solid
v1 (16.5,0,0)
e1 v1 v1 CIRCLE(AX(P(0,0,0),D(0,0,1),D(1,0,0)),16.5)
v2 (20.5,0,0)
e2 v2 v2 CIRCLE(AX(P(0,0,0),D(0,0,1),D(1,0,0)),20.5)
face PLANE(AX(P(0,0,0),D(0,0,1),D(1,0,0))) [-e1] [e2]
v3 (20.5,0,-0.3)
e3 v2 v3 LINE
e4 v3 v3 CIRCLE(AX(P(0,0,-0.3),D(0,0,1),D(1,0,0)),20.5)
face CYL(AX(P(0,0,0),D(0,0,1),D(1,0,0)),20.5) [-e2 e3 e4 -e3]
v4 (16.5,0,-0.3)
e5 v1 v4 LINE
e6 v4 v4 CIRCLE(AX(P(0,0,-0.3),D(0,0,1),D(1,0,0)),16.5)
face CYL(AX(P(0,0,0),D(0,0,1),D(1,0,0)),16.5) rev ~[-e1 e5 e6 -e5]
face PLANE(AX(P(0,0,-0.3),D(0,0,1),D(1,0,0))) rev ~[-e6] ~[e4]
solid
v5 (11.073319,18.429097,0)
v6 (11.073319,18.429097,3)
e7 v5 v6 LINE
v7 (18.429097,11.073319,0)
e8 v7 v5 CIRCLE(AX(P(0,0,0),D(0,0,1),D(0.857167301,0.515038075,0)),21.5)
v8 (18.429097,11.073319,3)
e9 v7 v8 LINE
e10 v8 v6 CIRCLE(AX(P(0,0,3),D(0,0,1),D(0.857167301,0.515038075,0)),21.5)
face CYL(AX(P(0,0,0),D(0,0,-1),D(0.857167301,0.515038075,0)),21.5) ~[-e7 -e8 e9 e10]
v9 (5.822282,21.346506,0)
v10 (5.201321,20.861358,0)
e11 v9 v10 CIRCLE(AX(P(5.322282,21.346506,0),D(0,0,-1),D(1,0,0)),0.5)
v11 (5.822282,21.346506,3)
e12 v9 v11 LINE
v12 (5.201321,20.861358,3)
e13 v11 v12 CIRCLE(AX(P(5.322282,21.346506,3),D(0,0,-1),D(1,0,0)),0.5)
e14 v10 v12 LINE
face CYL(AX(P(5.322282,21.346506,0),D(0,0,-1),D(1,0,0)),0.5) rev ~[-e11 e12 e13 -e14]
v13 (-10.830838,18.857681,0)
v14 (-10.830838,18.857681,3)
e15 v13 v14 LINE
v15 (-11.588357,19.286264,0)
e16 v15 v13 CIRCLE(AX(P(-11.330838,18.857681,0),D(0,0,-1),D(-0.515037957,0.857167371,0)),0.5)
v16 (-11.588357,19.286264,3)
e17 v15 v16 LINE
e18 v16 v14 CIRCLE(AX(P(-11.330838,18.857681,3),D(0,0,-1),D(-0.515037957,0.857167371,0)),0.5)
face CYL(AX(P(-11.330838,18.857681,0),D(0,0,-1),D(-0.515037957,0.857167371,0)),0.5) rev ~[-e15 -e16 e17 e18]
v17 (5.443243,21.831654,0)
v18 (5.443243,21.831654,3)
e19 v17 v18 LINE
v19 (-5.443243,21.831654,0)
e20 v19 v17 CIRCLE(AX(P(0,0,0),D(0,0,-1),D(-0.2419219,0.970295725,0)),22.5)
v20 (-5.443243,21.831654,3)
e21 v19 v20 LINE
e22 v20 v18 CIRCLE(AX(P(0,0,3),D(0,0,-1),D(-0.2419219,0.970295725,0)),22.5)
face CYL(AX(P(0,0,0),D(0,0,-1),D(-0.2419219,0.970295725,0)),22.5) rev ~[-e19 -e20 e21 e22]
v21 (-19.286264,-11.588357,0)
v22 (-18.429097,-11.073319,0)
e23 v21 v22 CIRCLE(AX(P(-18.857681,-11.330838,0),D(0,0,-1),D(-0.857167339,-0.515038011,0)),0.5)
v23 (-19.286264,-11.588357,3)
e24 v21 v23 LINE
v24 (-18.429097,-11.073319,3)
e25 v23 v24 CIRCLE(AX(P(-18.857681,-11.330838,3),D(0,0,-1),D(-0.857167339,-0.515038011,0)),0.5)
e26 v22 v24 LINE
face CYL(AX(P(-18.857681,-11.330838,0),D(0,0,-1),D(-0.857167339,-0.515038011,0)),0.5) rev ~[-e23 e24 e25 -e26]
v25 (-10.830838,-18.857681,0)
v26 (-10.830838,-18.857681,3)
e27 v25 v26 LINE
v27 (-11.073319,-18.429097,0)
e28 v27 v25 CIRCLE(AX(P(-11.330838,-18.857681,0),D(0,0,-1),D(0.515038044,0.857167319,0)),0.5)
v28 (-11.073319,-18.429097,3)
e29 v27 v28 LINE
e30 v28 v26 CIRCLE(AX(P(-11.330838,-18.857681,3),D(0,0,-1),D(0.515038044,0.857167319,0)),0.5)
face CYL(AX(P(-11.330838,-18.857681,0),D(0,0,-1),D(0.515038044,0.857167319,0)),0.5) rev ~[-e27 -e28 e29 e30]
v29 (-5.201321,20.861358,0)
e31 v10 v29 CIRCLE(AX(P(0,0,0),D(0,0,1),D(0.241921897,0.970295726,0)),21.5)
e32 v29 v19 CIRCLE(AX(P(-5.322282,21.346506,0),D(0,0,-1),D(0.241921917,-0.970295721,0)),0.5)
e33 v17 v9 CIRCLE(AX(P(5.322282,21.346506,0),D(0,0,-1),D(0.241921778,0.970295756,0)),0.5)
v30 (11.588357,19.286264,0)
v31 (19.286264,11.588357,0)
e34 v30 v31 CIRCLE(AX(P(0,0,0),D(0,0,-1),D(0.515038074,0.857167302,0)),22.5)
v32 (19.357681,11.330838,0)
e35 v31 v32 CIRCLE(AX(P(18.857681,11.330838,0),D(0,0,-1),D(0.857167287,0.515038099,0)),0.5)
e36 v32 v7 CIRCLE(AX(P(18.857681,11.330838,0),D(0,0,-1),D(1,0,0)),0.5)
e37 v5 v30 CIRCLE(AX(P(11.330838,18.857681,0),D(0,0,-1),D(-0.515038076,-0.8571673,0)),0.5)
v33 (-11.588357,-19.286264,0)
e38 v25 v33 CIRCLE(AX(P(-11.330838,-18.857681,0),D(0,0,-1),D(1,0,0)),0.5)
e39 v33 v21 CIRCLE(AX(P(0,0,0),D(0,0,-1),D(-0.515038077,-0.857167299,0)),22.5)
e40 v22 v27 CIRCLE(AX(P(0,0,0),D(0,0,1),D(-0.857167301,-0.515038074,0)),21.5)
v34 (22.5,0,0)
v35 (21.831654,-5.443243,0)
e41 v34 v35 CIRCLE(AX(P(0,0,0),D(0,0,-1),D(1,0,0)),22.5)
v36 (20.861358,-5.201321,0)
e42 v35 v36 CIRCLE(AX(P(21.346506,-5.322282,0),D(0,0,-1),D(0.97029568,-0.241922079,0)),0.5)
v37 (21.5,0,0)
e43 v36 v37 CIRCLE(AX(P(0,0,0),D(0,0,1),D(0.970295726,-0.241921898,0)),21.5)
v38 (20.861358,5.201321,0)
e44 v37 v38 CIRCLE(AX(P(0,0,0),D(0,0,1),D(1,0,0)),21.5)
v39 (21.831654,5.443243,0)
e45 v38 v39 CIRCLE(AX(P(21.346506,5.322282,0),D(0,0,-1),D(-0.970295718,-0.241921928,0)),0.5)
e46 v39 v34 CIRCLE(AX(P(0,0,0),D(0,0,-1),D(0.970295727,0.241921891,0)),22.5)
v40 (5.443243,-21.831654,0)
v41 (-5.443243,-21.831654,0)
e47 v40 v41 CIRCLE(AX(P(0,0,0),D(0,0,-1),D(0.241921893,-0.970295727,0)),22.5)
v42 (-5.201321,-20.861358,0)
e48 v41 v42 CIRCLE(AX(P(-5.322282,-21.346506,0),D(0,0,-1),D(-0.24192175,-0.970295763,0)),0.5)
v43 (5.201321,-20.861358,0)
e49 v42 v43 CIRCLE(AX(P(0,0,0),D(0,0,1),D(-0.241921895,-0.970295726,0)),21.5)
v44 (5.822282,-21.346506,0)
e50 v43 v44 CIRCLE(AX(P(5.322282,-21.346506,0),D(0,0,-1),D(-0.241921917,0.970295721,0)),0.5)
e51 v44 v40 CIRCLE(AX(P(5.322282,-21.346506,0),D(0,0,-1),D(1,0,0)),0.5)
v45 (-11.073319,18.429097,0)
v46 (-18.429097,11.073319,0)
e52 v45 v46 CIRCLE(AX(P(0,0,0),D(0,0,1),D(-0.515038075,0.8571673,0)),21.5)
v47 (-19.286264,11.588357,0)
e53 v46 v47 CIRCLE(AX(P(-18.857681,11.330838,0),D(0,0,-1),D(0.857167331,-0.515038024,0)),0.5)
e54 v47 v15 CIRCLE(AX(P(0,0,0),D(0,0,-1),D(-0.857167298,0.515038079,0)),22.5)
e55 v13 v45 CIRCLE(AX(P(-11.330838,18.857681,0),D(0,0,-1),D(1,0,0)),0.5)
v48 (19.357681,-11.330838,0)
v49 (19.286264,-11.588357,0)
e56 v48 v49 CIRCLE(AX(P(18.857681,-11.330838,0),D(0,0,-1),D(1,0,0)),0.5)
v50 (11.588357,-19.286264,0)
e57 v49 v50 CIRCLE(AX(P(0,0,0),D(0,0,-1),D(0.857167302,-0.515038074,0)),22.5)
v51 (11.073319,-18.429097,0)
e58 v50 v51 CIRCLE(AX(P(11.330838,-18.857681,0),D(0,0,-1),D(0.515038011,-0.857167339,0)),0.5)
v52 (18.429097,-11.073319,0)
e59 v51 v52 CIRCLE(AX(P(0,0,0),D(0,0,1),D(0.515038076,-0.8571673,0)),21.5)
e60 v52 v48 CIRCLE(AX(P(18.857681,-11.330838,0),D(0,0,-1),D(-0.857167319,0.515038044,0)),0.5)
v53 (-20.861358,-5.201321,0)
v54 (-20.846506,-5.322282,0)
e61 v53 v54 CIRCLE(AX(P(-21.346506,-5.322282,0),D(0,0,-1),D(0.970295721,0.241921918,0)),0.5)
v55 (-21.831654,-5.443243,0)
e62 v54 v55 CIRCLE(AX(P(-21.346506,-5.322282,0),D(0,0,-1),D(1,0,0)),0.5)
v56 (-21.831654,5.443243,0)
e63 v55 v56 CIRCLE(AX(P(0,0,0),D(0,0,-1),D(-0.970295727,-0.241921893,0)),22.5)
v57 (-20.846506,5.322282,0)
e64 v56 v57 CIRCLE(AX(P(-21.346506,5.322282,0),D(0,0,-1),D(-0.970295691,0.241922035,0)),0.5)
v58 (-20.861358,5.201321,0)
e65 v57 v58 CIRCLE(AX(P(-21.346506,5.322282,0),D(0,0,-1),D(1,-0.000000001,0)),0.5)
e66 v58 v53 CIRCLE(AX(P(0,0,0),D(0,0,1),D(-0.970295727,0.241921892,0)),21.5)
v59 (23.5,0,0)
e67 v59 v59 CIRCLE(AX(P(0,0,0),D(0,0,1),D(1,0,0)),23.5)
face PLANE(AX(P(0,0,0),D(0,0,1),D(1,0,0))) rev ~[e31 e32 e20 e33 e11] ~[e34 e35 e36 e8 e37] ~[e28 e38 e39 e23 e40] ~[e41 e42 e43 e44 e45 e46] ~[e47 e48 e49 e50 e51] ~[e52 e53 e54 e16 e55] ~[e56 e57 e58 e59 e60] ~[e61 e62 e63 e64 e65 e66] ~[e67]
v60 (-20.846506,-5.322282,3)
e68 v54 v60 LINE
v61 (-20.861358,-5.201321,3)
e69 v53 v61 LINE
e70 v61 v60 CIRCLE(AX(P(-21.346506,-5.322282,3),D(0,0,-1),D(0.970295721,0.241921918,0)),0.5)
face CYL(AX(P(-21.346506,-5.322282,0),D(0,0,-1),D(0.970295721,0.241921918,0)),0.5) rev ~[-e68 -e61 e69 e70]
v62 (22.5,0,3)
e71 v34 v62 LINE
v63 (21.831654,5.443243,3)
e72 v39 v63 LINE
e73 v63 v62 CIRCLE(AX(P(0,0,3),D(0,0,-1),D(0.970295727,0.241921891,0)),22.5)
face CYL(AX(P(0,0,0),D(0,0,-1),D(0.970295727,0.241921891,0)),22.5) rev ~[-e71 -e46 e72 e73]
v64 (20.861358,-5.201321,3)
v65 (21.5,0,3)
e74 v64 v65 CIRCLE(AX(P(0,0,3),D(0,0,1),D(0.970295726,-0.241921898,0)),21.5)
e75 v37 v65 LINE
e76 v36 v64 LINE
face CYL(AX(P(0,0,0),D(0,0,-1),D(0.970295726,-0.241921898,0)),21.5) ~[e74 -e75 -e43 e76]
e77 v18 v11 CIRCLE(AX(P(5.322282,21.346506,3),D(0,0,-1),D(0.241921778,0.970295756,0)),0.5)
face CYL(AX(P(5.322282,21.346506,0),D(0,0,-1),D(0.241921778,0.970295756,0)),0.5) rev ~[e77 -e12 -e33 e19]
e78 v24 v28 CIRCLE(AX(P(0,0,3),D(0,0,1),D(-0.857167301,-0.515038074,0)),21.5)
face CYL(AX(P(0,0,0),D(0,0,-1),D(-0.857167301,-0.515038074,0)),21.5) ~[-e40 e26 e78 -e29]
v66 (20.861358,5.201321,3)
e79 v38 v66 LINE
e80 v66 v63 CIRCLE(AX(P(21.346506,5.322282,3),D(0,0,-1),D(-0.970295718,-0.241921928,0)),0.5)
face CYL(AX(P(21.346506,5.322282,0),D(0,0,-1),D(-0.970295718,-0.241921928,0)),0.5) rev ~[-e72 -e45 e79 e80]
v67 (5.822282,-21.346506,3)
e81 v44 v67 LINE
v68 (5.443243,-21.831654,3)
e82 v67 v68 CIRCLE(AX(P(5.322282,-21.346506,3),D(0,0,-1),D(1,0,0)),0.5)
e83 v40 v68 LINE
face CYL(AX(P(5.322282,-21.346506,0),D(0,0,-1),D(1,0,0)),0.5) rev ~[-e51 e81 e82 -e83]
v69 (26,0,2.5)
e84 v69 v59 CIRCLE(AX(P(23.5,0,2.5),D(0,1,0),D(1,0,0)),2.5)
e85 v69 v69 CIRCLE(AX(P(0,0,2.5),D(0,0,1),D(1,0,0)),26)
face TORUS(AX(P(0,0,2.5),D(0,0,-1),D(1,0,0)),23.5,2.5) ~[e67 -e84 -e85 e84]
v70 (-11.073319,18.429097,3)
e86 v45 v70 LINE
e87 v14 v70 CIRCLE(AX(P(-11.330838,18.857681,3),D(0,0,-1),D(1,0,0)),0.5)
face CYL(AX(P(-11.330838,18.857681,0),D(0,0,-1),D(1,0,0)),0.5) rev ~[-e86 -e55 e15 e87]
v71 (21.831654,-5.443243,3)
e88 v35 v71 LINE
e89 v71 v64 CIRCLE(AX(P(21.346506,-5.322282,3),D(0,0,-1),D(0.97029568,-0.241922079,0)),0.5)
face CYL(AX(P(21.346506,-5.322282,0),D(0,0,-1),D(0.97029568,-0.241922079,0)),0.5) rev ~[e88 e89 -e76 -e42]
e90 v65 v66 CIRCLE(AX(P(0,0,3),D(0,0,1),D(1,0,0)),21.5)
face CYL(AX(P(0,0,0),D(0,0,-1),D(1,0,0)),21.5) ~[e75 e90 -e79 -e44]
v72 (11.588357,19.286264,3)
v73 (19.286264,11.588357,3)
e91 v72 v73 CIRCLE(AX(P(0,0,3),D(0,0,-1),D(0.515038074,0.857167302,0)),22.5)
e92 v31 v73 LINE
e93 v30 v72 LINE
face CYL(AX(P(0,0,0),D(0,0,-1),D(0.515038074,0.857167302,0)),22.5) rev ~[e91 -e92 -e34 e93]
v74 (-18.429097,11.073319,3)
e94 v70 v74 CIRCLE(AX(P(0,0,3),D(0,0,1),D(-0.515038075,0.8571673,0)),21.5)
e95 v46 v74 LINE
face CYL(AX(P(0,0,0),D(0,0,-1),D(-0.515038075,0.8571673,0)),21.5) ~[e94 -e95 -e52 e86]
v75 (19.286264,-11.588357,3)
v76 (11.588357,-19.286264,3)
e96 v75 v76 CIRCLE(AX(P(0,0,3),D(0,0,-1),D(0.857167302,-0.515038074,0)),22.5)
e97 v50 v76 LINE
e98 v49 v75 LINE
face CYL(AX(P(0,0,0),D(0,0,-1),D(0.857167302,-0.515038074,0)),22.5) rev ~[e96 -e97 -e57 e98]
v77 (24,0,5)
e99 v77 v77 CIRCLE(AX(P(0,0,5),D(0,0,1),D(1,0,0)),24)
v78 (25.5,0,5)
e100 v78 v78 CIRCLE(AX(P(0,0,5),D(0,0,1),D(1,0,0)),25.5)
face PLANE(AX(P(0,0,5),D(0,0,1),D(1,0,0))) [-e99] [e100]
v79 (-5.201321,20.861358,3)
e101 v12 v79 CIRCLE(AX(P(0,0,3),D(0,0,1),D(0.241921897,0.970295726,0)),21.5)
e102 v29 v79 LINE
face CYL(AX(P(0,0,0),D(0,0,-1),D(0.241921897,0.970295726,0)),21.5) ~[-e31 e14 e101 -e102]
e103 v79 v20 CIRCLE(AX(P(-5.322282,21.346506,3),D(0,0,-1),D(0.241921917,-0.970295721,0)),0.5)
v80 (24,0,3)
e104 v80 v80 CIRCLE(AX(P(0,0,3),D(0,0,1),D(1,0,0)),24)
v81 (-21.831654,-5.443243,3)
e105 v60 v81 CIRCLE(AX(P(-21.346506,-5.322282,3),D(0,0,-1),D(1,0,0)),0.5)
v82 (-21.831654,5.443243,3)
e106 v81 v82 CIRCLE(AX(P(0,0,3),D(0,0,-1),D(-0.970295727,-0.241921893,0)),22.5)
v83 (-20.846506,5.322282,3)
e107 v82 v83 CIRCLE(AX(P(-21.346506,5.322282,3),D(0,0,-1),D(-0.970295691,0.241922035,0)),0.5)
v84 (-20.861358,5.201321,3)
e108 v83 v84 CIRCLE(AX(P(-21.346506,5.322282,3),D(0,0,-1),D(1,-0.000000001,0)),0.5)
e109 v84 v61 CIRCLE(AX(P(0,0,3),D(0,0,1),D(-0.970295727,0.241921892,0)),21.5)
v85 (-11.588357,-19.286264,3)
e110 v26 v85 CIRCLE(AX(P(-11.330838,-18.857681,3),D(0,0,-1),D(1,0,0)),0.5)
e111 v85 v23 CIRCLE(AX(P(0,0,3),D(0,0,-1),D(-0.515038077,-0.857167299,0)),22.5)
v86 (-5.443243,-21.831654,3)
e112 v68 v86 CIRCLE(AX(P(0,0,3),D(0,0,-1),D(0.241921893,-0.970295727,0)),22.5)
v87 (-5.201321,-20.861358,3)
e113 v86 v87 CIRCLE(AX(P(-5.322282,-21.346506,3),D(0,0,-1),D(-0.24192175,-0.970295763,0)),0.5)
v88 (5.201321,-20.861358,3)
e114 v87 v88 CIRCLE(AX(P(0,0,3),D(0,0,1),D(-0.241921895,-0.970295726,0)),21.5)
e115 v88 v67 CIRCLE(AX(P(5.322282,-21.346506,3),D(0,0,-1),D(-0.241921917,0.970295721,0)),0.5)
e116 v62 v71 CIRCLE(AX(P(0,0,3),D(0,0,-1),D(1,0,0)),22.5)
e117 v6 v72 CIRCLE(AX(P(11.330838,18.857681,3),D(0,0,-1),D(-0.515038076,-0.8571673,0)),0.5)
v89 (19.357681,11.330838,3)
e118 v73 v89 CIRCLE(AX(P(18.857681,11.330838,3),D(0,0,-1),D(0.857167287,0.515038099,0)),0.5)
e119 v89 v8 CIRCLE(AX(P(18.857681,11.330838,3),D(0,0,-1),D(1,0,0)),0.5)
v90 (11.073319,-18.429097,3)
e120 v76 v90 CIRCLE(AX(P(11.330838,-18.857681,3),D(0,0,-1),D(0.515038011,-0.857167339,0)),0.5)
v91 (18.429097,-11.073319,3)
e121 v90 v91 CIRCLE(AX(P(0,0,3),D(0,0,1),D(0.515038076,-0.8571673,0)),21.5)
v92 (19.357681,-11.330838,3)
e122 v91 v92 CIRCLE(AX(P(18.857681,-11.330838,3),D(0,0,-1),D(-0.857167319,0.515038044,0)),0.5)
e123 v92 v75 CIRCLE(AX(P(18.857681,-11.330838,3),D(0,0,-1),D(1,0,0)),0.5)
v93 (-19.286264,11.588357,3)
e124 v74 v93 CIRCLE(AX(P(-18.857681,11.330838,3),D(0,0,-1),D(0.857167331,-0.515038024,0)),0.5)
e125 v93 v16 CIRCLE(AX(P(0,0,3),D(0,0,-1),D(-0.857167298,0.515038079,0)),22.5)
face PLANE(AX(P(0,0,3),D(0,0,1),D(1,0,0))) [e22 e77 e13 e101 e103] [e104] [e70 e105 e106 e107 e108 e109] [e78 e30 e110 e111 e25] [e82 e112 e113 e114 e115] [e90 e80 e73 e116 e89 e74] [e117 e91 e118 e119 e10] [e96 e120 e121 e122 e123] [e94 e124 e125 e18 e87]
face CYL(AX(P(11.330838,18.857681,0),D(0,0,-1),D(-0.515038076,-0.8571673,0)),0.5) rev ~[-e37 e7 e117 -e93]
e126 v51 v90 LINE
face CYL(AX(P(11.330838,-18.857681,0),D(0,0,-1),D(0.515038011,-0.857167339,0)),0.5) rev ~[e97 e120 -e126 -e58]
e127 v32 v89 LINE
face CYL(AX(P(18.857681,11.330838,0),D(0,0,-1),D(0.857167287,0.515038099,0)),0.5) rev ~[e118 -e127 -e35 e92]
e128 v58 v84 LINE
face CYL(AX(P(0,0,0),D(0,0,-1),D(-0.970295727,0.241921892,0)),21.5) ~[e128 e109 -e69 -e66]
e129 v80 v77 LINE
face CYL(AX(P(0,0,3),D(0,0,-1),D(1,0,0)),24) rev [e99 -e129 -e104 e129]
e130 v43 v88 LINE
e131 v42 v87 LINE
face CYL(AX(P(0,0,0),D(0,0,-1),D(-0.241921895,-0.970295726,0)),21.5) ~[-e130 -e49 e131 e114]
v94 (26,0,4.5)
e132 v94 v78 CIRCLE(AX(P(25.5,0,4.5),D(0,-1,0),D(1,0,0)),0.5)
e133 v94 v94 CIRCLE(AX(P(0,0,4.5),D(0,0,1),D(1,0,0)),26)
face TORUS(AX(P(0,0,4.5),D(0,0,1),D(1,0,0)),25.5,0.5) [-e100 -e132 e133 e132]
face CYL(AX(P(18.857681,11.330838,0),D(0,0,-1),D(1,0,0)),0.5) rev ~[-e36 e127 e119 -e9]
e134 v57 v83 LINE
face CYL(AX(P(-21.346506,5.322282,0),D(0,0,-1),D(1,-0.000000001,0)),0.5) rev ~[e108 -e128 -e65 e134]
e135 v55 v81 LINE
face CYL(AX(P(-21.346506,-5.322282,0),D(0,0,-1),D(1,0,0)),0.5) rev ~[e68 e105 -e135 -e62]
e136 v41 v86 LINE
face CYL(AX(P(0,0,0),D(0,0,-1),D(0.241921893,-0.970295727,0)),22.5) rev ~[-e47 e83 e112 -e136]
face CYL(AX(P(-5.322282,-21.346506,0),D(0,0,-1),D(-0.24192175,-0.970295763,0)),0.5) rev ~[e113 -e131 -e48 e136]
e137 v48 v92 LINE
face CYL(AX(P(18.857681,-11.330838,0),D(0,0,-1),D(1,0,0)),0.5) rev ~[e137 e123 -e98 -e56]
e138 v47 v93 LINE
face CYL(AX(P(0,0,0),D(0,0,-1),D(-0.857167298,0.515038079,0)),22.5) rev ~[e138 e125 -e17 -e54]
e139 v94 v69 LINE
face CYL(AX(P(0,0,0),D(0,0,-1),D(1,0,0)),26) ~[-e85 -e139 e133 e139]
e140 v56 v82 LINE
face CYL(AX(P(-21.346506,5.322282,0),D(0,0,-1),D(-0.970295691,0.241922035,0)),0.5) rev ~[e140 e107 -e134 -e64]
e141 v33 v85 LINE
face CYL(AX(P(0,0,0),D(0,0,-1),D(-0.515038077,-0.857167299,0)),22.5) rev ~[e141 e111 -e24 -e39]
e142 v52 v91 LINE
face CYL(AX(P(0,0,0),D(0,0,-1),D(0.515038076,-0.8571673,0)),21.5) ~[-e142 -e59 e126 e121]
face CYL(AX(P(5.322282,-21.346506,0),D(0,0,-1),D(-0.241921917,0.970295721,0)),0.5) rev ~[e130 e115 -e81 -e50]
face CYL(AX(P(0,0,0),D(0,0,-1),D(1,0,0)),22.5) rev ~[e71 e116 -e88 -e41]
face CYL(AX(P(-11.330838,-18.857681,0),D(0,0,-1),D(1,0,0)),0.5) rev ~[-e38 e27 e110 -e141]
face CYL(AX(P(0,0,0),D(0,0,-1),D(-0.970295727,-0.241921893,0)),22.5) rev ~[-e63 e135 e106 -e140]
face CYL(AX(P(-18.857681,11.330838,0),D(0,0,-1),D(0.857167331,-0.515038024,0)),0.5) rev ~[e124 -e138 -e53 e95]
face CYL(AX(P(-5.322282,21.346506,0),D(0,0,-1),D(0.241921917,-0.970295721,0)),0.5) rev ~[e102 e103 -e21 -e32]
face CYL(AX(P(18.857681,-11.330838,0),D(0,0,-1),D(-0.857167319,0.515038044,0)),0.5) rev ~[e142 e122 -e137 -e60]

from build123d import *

# Parameters (mm, degrees)
F1_START = 3
F0_R     = 26
F0_R_2   = 24
F1_DEPTH = 2
F0_R_3   = 20.5
F0_R_4   = 16.5
F2_DEPTH = 3
F3_R     = 2.5
F4_R     = 0.5
F5_DEPTH = 0.3


with BuildPart() as f1:
    # F0 (on Top) → F1 (new body)
    with BuildSketch(Plane.XY.offset(F1_START)):
        Circle(F0_R)
        Circle(F0_R_2, mode=Mode.SUBTRACT)
    extrude(amount=F1_DEPTH)

    # F0 (on Top) → F2 (join)
    with BuildSketch(Plane.XY):
        Circle(F0_R)
        Circle(F0_R_2, mode=Mode.SUBTRACT)
        Circle(F0_R_2)
        with BuildLine():
            ThreePointArc((21.8316538648, 5.4432425563), (22.3322884179, 2.7420601782), (22.5, 0))
            ThreePointArc((22.5, 0), (22.3322884062, -2.7420602736), (21.8316538183, -5.4432427429))
            ThreePointArc((21.8316538183, -5.4432427429), (20.7872894705, -8.6103772548), (19.286264285, -11.5883566536))
            ThreePointArc((19.286264285, -11.5883566536), (15.9099025767, -15.9099025767), (11.5883566536, -19.286264285))
            ThreePointArc((11.5883566536, -19.286264285), (8.6103771829, -20.7872895003), (5.4432425919, -21.8316538559))
            ThreePointArc((5.4432425919, -21.8316538559), (7e-09, -22.5), (-5.4432425783, -21.8316538593))
            ThreePointArc((-5.4432425783, -21.8316538593), (-8.6103772201, -20.7872894849), (-11.5883567347, -19.2862642362))
            ThreePointArc((-11.5883567347, -19.2862642362), (-15.9099026102, -15.9099025432), (-19.286264285, -11.5883566536))
            ThreePointArc((-19.286264285, -11.5883566536), (-20.7872895003, -8.6103771829), (-21.8316538559, -5.4432425919))
            ThreePointArc((-21.8316538559, -5.4432425919), (-22.5, 6.65e-08), (-21.8316538238, 5.4432427209))
            ThreePointArc((-21.8316538238, 5.4432427209), (-20.7872894493, 8.610377306), (-19.2862642162, 11.5883567681))
            ThreePointArc((-19.2862642162, 11.5883567681), (-15.9099025183, 15.9099026351), (-11.5883566265, 19.2862643012))
            ThreePointArc((-11.5883566265, 19.2862643012), (-8.6103772402, 20.7872894765), (-5.4432427429, 21.8316538183))
            ThreePointArc((-5.4432427429, 21.8316538183), (-7.78e-08, 22.5), (5.4432425919, 21.8316538559))
            ThreePointArc((5.4432425919, 21.8316538559), (8.6103771829, 20.7872895003), (11.5883566536, 19.286264285))
            ThreePointArc((11.5883566536, 19.286264285), (15.9099025587, 15.9099025947), (19.2862642587, 11.5883566973))
            ThreePointArc((19.2862642587, 11.5883566973), (20.7872894975, 8.6103771895), (21.8316538648, 5.4432425563))
        make_face(mode=Mode.SUBTRACT)
        with BuildLine():
            ThreePointArc((21.5, 0), (21.3397422613, 2.6201908748), (20.861358119, 5.201320739))
            ThreePointArc((20.861358119, 5.201320739), (19.8634099525, 8.2276937874), (18.4290969658, 11.0733186094))
            ThreePointArc((18.4290969658, 11.0733186094), (15.2027957959, 15.2027957951), (11.0733186103, 18.4290969652))
            ThreePointArc((11.0733186103, 18.4290969652), (8.2276938087, 19.8634099437), (5.2013207828, 20.8613581081))
            ThreePointArc((5.2013207828, 20.8613581081), (1.96e-08, 21.5), (-5.2013207448, 20.8613581176))
            ThreePointArc((-5.2013207448, 20.8613581176), (-8.2276937956, 19.8634099491), (-11.0733186195, 18.4290969597))
            ThreePointArc((-11.0733186195, 18.4290969597), (-15.2027957888, 15.2027958023), (-18.4290969499, 11.0733186359))
            ThreePointArc((-18.4290969499, 11.0733186359), (-19.8634099566, 8.2276937776), (-20.8613581316, 5.2013206884))
            ThreePointArc((-20.8613581316, 5.2013206884), (-21.5, -2.91e-08), (-20.8613581176, -5.2013207448))
            ThreePointArc((-20.8613581176, -5.2013207448), (-19.8634099536, -8.2276937847), (-18.4290969719, -11.0733185993))
            ThreePointArc((-18.4290969719, -11.0733185993), (-15.2027958064, -15.2027957846), (-11.0733186258, -18.429096956))
            ThreePointArc((-11.0733186258, -18.429096956), (-8.227693799, -19.8634099477), (-5.2013207448, -20.8613581176))
            ThreePointArc((-5.2013207448, -20.8613581176), (0, -21.5), (5.2013207448, -20.8613581176))
            ThreePointArc((5.2013207448, -20.8613581176), (8.227693799, -19.8634099477), (11.0733186258, -18.429096956))
            ThreePointArc((11.0733186258, -18.429096956), (15.2027957955, -15.2027957955), (18.429096956, -11.0733186258))
            ThreePointArc((18.429096956, -11.0733186258), (19.8634099351, -8.2276938293), (20.8613581017, -5.2013208084))
            ThreePointArc((20.8613581017, -5.2013208084), (21.339742257, -2.6201909103), (21.5, 0))
        make_face()
        Circle(F0_R_3, mode=Mode.SUBTRACT)
        Circle(F0_R_3)
        Circle(F0_R_4, mode=Mode.SUBTRACT)
        Circle(F0_R_4)
        with BuildLine():
            ThreePointArc((-18.4290969499, 11.0733186359), (-19.1151996816, 10.9022540149), (-19.2862642162, 11.5883567681))
            ThreePointArc((-19.2862642162, 11.5883567681), (-20.7872894493, 8.610377306), (-21.8316538238, 5.4432427209))
            ThreePointArc((-21.8316538238, 5.4432427209), (-21.2855712706, 5.8185547746), (-20.8465059781, 5.3222817032))
            ThreePointArc((-20.8465059781, 5.3222817032), (-20.8502329065, 5.2613469972), (-20.8613581316, 5.2013206884))
            ThreePointArc((-20.8613581316, 5.2013206884), (-19.8634099566, 8.2276937776), (-18.4290969499, 11.0733186359))
        make_face()
        with BuildLine():
            ThreePointArc((-5.2013207448, 20.8613581176), (-5.8074295536, 21.225544979), (-5.4432427429, 21.8316538183))
            ThreePointArc((-5.4432427429, 21.8316538183), (-8.6103772402, 20.7872894765), (-11.5883566265, 19.2862643012))
            ThreePointArc((-11.5883566265, 19.2862643012), (-11.084625838, 19.2928584465), (-10.830837648, 18.8576806154))
            ThreePointArc((-10.830837648, 18.8576806154), (-10.8956598026, 18.6114688309), (-11.0733186195, 18.4290969597))
            ThreePointArc((-11.0733186195, 18.4290969597), (-8.2276937956, 19.8634099491), (-5.2013207448, 20.8613581176))
        make_face()
        with BuildLine():
            ThreePointArc((11.0733186103, 18.4290969652), (10.9022539882, 19.1151996371), (11.5883566536, 19.286264285))
            ThreePointArc((11.5883566536, 19.286264285), (8.6103771829, 20.7872895003), (5.4432425919, 21.8316538559))
            ThreePointArc((5.4432425919, 21.8316538559), (5.7162870612, 21.6543367397), (5.8222817032, 21.3465059781))
            ThreePointArc((5.8222817032, 21.3465059781), (5.630112452, 20.95250061), (5.2013207828, 20.8613581081))
            ThreePointArc((5.2013207828, 20.8613581081), (8.2276938087, 19.8634099437), (11.0733186103, 18.4290969652))
        make_face()
        with BuildLine():
            ThreePointArc((20.861358119, 5.201320739), (21.2255450694, 5.8074295761), (21.8316538648, 5.4432425563))
            ThreePointArc((21.8316538648, 5.4432425563), (20.7872894975, 8.6103771895), (19.2862642587, 11.5883566973))
            ThreePointArc((19.2862642587, 11.5883566973), (19.3394958402, 11.4644568427), (19.3576806154, 11.330837648))
            ThreePointArc((19.3576806154, 11.330837648), (18.9912998041, 10.8490224216), (18.4290969658, 11.0733186094))
            ThreePointArc((18.4290969658, 11.0733186094), (19.8634099525, 8.2276937874), (20.861358119, 5.201320739))
        make_face()
        with BuildLine():
            ThreePointArc((19.286264285, -11.5883566536), (20.7872894705, -8.6103772548), (21.8316538183, -5.4432427429))
            ThreePointArc((21.8316538183, -5.4432427429), (21.2255450109, -5.8074295615), (20.8613581017, -5.2013208084))
            ThreePointArc((20.8613581017, -5.2013208084), (19.8634099351, -8.2276938293), (18.429096956, -11.0733186258))
            ThreePointArc((18.429096956, -11.0733186258), (18.9912997949, -10.849022419), (19.3576806154, -11.330837648))
            ThreePointArc((19.3576806154, -11.330837648), (19.339495847, -11.4644568181), (19.286264285, -11.5883566536))
        make_face()
        with BuildLine():
            ThreePointArc((5.4432425919, -21.8316538559), (8.6103771829, -20.7872895003), (11.5883566536, -19.286264285))
            ThreePointArc((11.5883566536, -19.286264285), (10.9022539835, -19.1151996293), (11.0733186258, -18.429096956))
            ThreePointArc((11.0733186258, -18.429096956), (8.227693799, -19.8634099477), (5.2013207448, -20.8613581176))
            ThreePointArc((5.2013207448, -20.8613581176), (5.6301124365, -20.9525005979), (5.8222817032, -21.3465059781))
            ThreePointArc((5.8222817032, -21.3465059781), (5.7162870612, -21.6543367397), (5.4432425919, -21.8316538559))
        make_face()
        with BuildLine():
            ThreePointArc((-11.5883567347, -19.2862642362), (-8.6103772201, -20.7872894849), (-5.4432425783, -21.8316538593))
            ThreePointArc((-5.4432425783, -21.8316538593), (-5.8074295741, -21.2255450613), (-5.2013207448, -20.8613581176))
            ThreePointArc((-5.2013207448, -20.8613581176), (-8.227693799, -19.8634099477), (-11.0733186258, -18.429096956))
            ThreePointArc((-11.0733186258, -18.429096956), (-10.8956598044, -18.6114688277), (-10.830837648, -18.8576806154))
            ThreePointArc((-10.830837648, -18.8576806154), (-11.0846258929, -19.2928584775), (-11.5883567347, -19.2862642362))
        make_face()
        with BuildLine():
            ThreePointArc((-21.8316538559, -5.4432425919), (-20.7872895003, -8.6103771829), (-19.286264285, -11.5883566536))
            ThreePointArc((-19.286264285, -11.5883566536), (-19.1151996426, -10.9022539915), (-18.4290969719, -11.0733185993))
            ThreePointArc((-18.4290969719, -11.0733185993), (-19.8634099536, -8.2276937847), (-20.8613581176, -5.2013207448))
            ThreePointArc((-20.8613581176, -5.2013207448), (-20.8502329029, -5.2613470261), (-20.8465059781, -5.3222817032))
            ThreePointArc((-20.8465059781, -5.3222817032), (-21.2855713366, -5.8185547827), (-21.8316538559, -5.4432425919))
        make_face()
    extrude(amount=F2_DEPTH)

    # F3
    f3_edges = [f1.edges().sort_by_distance(p)[0] for p in [
        (-26, 0, 0),
    ]]
    fillet(f3_edges, radius=F3_R)

    # F4
    f4_edges = [f1.edges().sort_by_distance(p)[0] for p in [
        (-26, 0, 5),
    ]]
    fillet(f4_edges, radius=F4_R)


with BuildPart() as f5:
    # F0 (on Top) → F5 (new body)
    with BuildSketch(Plane.XY):
        Circle(F0_R_3)
        Circle(F0_R_4, mode=Mode.SUBTRACT)
    extrude(amount=-F5_DEPTH)


solid = Compound([f1.part, f5.part])
